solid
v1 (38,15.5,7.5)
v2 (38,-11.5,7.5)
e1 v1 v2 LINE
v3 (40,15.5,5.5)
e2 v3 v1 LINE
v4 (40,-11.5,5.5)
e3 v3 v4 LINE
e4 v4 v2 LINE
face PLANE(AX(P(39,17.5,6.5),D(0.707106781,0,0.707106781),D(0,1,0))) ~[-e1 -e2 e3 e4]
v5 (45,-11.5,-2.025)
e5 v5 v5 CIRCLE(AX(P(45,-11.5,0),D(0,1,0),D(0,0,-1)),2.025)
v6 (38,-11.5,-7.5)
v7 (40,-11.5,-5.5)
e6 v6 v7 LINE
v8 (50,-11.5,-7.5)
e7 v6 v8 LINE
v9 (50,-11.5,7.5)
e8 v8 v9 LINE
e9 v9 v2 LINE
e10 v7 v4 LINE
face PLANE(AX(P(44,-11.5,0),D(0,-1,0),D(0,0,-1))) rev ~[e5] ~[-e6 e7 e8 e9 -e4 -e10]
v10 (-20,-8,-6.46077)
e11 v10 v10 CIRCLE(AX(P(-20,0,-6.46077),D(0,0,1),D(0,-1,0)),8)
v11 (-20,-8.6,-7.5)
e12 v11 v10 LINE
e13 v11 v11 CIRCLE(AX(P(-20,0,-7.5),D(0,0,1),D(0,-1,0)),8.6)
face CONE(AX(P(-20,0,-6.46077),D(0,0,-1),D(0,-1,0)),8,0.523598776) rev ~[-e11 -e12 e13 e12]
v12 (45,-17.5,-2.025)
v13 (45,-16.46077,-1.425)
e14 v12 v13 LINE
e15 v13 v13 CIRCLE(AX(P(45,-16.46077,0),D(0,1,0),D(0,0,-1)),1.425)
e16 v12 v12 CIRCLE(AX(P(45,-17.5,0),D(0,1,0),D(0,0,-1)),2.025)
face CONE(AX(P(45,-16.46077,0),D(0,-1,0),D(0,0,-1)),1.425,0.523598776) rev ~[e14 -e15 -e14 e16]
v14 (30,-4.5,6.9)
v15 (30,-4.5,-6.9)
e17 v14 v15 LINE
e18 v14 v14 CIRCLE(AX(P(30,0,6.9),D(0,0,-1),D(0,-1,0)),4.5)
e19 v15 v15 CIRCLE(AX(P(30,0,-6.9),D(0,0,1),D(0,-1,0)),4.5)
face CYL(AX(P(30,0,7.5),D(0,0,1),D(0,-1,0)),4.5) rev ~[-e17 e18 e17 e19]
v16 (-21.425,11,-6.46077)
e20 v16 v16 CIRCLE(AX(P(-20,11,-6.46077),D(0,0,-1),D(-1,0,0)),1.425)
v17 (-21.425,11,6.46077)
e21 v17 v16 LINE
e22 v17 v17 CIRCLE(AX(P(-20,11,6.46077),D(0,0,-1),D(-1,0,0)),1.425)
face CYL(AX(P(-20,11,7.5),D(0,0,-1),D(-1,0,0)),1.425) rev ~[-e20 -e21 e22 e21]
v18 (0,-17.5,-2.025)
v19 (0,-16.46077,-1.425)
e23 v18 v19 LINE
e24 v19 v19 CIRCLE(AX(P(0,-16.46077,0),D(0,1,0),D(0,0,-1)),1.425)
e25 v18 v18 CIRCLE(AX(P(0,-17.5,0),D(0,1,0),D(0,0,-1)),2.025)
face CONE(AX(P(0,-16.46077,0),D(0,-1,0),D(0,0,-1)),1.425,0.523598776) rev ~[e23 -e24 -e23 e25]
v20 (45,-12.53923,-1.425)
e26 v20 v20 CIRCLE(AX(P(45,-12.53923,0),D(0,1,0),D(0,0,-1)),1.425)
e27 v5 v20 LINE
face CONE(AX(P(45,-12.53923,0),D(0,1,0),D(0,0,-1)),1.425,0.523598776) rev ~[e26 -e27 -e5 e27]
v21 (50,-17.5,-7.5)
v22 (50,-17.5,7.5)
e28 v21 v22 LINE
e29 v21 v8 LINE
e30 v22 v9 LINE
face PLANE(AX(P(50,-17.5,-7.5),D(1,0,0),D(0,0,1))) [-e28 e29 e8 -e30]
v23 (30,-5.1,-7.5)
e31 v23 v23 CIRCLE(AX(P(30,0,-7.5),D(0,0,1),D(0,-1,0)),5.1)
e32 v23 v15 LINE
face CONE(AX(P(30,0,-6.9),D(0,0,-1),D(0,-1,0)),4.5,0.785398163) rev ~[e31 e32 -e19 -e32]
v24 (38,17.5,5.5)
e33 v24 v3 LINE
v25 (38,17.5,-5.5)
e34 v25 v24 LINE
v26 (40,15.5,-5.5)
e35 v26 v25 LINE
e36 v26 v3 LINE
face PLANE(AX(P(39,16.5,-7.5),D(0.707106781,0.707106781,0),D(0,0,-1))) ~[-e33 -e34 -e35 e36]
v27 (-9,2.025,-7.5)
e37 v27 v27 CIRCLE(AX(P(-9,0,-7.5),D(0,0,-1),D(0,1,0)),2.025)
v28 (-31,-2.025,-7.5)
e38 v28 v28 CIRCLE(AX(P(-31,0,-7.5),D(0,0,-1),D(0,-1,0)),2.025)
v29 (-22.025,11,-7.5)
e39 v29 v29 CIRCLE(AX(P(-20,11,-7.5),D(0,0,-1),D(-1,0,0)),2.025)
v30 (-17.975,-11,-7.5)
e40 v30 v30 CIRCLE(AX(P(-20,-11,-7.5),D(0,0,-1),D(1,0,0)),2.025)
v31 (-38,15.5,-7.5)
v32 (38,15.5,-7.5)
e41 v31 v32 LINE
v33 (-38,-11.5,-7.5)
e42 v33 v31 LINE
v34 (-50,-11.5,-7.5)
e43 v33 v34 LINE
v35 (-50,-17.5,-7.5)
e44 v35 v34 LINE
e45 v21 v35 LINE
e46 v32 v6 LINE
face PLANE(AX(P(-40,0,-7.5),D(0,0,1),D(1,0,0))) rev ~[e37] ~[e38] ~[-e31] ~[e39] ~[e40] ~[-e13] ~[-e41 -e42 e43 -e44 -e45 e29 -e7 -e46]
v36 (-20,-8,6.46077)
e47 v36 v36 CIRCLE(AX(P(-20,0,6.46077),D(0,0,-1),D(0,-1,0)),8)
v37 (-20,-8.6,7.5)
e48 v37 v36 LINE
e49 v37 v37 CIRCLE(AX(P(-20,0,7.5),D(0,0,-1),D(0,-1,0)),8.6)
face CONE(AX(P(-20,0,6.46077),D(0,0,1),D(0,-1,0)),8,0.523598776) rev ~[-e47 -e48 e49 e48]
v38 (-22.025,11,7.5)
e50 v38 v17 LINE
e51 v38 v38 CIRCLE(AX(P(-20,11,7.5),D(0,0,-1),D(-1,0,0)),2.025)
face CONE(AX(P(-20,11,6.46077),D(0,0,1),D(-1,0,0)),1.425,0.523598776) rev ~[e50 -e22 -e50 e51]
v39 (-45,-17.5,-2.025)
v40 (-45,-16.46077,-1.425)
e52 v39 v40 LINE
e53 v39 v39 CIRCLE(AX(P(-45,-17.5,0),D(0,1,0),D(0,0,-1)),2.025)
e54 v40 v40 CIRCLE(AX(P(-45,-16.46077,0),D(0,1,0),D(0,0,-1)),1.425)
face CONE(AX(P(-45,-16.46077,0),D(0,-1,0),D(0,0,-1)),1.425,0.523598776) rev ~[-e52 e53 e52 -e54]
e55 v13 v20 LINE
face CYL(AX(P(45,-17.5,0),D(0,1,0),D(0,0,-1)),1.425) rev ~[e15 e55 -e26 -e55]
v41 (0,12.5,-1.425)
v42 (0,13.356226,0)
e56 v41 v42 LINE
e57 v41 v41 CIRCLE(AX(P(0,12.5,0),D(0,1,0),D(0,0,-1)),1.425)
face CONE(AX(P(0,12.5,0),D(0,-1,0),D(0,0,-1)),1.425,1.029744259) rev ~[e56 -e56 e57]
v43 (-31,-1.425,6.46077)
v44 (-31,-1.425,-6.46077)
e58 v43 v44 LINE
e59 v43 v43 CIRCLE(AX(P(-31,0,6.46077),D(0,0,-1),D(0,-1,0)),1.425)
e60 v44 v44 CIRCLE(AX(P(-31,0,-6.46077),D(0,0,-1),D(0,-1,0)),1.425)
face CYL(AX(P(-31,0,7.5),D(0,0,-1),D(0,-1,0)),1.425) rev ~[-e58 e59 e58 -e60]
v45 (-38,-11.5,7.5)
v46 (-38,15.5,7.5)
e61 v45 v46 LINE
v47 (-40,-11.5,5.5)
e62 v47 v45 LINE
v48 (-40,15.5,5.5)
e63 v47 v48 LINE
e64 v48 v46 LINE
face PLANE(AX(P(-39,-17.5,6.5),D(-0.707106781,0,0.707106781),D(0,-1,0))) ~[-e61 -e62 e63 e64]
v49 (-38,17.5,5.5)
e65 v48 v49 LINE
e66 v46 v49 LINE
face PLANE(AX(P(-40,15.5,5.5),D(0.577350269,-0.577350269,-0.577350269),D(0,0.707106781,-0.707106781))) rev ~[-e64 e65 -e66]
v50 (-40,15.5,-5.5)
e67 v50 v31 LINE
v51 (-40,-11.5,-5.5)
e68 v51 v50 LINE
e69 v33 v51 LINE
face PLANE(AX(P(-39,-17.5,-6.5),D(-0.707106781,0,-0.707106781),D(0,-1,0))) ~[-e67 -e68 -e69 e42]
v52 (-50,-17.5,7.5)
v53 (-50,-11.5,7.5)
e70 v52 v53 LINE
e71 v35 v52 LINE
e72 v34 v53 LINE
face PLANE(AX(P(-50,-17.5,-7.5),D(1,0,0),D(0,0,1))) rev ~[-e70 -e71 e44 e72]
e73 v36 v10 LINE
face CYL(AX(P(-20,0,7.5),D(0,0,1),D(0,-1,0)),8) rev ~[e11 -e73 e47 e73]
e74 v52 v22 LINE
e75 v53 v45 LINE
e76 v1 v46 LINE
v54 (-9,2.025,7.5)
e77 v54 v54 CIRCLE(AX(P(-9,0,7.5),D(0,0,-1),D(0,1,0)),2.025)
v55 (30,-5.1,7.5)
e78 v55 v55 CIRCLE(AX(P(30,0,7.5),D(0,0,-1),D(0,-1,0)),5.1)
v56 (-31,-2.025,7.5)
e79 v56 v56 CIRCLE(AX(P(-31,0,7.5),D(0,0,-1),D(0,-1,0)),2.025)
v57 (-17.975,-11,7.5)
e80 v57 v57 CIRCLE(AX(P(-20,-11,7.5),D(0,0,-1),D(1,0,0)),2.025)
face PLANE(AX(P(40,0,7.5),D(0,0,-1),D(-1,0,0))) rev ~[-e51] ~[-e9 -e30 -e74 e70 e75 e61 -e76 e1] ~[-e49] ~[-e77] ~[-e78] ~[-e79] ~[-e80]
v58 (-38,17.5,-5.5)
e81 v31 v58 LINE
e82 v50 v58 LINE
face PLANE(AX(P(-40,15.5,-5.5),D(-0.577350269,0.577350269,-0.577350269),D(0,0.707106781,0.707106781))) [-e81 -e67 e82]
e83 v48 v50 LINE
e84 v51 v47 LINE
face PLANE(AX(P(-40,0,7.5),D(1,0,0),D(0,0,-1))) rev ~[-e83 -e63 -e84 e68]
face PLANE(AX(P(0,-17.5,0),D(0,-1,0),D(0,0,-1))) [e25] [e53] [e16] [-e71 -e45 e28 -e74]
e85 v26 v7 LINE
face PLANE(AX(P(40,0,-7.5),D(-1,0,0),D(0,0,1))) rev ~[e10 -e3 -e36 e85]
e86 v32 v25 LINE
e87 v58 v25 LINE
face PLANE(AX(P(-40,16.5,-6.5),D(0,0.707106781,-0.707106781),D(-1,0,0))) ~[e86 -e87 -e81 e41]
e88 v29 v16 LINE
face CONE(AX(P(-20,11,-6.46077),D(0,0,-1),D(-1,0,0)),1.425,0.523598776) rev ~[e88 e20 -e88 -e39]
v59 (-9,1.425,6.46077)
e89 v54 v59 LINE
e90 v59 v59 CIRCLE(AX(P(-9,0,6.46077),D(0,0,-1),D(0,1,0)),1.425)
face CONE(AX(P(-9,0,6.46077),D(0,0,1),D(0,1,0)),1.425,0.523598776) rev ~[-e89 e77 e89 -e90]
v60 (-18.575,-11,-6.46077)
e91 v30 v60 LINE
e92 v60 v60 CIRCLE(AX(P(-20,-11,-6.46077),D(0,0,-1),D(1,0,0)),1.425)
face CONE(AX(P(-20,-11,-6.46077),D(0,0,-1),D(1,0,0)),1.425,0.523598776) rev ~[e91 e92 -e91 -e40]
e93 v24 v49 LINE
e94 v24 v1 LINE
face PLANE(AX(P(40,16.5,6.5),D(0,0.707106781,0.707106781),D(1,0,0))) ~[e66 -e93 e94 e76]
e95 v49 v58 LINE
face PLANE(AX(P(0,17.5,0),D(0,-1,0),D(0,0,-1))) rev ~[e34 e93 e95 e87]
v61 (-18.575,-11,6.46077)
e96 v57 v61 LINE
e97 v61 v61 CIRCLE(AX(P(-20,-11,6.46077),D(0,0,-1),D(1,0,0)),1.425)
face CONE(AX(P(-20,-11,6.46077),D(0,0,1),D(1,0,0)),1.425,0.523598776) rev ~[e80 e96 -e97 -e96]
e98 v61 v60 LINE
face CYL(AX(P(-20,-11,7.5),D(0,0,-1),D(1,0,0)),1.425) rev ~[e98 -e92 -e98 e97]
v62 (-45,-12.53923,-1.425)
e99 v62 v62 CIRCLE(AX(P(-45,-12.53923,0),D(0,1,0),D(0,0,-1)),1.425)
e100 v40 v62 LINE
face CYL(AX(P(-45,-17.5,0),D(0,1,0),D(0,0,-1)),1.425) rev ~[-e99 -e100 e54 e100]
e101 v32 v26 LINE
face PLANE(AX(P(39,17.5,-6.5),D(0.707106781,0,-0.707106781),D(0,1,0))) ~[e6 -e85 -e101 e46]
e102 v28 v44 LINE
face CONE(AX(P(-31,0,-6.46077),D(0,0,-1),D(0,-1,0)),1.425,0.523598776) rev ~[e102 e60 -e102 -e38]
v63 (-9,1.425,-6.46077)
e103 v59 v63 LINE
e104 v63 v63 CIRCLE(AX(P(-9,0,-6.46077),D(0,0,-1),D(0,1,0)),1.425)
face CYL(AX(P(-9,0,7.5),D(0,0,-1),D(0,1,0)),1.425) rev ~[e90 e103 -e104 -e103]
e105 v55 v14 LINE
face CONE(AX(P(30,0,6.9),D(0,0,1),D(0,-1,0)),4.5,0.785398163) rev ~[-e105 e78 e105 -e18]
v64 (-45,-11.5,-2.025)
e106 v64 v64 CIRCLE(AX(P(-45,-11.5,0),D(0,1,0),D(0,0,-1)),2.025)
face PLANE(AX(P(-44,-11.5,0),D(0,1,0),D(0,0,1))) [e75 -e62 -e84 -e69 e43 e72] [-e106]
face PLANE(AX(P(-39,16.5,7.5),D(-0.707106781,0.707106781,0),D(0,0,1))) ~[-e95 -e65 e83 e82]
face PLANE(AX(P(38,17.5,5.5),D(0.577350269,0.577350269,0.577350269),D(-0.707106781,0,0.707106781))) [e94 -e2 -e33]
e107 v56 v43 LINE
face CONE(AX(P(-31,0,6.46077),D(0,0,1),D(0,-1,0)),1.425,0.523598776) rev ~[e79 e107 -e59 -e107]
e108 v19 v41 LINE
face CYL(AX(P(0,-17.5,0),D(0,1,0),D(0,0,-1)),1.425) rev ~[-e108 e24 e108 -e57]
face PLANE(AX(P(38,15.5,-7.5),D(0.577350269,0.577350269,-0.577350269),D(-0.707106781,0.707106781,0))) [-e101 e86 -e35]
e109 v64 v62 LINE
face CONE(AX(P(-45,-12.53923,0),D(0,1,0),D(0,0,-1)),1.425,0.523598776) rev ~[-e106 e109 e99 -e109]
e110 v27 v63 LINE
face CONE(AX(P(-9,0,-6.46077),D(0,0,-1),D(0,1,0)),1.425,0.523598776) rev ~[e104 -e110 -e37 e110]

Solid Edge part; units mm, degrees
sketch "Sketch1" plane through (0, 0, 0) normal (0, -1, 0) x (1, 0, 0)
  line L0 (-40, -7.5) -> (40, -7.5)
  line L1 (40, -7.5) -> (40, 7.5)
  line L2 (40, 7.5) -> (-40, 7.5)
  line L3 (-40, 7.5) -> (-40, -7.5)
  dimension "D1" = 15
  dimension "D2" = 80
extrude "Protrusion1" add sketch "Sketch1" along normal mid plane 35
chamfer "Chamfer_1" distance 2 angle 45 8 edges at (40, 0, 7.5) (40, 17.5, 0) (40, 0, -7.5) (0, 17.5, 7.5) (0, 17.5, -7.5) (-40, 0, -7.5) (-40, 0, 7.5) (-40, 17.5, 0)
hole "Hole_1" at (-20, 0, 7.5) direction (0, 0, -1) diameter 16 end up to next start chamfer 0.6 start chamfer angle 30 end chamfer 0.6 end chamfer angle 30
hole "Hole_2" at (30, 0, 7.5) direction (0, 0, -1) diameter 9 end up to next start chamfer 0.6 start chamfer angle 45 end chamfer 0.6 end chamfer angle 45
sketch "Sketch2" plane through (0, -17.5, 0) normal (0, -1, 0) x (1, 0, 0)
  line L0 (-38, 7.5) -> (-38, -7.5)
  line L1 (-38, -7.5) -> (-50, -7.5)
  line L2 (-50, -7.5) -> (-50, 7.5)
  line L3 (-50, 7.5) -> (-38, 7.5)
  line L4 (38, 7.5) -> (38, -7.5)
  line L5 (38, -7.5) -> (50, -7.5)
  line L6 (50, -7.5) -> (50, 7.5)
  line L7 (50, 7.5) -> (38, 7.5)
  dimension "D1" = 100
extrude "ExtrudedProtrusion_2" add sketch "Sketch2" against normal blind 6
hole "Hole_3" at (-45, -17.5, 0) direction (0, 1, 0) diameter 2.85 depth 30 tip angle 118 start chamfer 0.6 start chamfer angle 30 end chamfer 0.6 end chamfer angle 30
hole "Hole1" at (45, -17.5, 0) direction (0, 1, 0) diameter 2.85 depth 30 tip angle 118 start chamfer 0.6 start chamfer angle 30 end chamfer 0.6 end chamfer angle 30
hole "Hole2" at (0, -17.5, 0) direction (0, 1, 0) diameter 2.85 depth 30 tip angle 118 start chamfer 0.6 start chamfer angle 30 end chamfer 0.6 end chamfer angle 30
hole "Hole_5" at (-31, 0, 7.5) direction (0, 0, -1) diameter 2.85 depth 30 tip angle 118 start chamfer 0.6 start chamfer angle 30 end chamfer 0.6 end chamfer angle 30
pattern_circular "Pattern2" count 4 over 360 about axis through (-20, 0, 6.4608) along (0, 0, 1) of "Hole_5"
properties material "Polyethylene, low density"
